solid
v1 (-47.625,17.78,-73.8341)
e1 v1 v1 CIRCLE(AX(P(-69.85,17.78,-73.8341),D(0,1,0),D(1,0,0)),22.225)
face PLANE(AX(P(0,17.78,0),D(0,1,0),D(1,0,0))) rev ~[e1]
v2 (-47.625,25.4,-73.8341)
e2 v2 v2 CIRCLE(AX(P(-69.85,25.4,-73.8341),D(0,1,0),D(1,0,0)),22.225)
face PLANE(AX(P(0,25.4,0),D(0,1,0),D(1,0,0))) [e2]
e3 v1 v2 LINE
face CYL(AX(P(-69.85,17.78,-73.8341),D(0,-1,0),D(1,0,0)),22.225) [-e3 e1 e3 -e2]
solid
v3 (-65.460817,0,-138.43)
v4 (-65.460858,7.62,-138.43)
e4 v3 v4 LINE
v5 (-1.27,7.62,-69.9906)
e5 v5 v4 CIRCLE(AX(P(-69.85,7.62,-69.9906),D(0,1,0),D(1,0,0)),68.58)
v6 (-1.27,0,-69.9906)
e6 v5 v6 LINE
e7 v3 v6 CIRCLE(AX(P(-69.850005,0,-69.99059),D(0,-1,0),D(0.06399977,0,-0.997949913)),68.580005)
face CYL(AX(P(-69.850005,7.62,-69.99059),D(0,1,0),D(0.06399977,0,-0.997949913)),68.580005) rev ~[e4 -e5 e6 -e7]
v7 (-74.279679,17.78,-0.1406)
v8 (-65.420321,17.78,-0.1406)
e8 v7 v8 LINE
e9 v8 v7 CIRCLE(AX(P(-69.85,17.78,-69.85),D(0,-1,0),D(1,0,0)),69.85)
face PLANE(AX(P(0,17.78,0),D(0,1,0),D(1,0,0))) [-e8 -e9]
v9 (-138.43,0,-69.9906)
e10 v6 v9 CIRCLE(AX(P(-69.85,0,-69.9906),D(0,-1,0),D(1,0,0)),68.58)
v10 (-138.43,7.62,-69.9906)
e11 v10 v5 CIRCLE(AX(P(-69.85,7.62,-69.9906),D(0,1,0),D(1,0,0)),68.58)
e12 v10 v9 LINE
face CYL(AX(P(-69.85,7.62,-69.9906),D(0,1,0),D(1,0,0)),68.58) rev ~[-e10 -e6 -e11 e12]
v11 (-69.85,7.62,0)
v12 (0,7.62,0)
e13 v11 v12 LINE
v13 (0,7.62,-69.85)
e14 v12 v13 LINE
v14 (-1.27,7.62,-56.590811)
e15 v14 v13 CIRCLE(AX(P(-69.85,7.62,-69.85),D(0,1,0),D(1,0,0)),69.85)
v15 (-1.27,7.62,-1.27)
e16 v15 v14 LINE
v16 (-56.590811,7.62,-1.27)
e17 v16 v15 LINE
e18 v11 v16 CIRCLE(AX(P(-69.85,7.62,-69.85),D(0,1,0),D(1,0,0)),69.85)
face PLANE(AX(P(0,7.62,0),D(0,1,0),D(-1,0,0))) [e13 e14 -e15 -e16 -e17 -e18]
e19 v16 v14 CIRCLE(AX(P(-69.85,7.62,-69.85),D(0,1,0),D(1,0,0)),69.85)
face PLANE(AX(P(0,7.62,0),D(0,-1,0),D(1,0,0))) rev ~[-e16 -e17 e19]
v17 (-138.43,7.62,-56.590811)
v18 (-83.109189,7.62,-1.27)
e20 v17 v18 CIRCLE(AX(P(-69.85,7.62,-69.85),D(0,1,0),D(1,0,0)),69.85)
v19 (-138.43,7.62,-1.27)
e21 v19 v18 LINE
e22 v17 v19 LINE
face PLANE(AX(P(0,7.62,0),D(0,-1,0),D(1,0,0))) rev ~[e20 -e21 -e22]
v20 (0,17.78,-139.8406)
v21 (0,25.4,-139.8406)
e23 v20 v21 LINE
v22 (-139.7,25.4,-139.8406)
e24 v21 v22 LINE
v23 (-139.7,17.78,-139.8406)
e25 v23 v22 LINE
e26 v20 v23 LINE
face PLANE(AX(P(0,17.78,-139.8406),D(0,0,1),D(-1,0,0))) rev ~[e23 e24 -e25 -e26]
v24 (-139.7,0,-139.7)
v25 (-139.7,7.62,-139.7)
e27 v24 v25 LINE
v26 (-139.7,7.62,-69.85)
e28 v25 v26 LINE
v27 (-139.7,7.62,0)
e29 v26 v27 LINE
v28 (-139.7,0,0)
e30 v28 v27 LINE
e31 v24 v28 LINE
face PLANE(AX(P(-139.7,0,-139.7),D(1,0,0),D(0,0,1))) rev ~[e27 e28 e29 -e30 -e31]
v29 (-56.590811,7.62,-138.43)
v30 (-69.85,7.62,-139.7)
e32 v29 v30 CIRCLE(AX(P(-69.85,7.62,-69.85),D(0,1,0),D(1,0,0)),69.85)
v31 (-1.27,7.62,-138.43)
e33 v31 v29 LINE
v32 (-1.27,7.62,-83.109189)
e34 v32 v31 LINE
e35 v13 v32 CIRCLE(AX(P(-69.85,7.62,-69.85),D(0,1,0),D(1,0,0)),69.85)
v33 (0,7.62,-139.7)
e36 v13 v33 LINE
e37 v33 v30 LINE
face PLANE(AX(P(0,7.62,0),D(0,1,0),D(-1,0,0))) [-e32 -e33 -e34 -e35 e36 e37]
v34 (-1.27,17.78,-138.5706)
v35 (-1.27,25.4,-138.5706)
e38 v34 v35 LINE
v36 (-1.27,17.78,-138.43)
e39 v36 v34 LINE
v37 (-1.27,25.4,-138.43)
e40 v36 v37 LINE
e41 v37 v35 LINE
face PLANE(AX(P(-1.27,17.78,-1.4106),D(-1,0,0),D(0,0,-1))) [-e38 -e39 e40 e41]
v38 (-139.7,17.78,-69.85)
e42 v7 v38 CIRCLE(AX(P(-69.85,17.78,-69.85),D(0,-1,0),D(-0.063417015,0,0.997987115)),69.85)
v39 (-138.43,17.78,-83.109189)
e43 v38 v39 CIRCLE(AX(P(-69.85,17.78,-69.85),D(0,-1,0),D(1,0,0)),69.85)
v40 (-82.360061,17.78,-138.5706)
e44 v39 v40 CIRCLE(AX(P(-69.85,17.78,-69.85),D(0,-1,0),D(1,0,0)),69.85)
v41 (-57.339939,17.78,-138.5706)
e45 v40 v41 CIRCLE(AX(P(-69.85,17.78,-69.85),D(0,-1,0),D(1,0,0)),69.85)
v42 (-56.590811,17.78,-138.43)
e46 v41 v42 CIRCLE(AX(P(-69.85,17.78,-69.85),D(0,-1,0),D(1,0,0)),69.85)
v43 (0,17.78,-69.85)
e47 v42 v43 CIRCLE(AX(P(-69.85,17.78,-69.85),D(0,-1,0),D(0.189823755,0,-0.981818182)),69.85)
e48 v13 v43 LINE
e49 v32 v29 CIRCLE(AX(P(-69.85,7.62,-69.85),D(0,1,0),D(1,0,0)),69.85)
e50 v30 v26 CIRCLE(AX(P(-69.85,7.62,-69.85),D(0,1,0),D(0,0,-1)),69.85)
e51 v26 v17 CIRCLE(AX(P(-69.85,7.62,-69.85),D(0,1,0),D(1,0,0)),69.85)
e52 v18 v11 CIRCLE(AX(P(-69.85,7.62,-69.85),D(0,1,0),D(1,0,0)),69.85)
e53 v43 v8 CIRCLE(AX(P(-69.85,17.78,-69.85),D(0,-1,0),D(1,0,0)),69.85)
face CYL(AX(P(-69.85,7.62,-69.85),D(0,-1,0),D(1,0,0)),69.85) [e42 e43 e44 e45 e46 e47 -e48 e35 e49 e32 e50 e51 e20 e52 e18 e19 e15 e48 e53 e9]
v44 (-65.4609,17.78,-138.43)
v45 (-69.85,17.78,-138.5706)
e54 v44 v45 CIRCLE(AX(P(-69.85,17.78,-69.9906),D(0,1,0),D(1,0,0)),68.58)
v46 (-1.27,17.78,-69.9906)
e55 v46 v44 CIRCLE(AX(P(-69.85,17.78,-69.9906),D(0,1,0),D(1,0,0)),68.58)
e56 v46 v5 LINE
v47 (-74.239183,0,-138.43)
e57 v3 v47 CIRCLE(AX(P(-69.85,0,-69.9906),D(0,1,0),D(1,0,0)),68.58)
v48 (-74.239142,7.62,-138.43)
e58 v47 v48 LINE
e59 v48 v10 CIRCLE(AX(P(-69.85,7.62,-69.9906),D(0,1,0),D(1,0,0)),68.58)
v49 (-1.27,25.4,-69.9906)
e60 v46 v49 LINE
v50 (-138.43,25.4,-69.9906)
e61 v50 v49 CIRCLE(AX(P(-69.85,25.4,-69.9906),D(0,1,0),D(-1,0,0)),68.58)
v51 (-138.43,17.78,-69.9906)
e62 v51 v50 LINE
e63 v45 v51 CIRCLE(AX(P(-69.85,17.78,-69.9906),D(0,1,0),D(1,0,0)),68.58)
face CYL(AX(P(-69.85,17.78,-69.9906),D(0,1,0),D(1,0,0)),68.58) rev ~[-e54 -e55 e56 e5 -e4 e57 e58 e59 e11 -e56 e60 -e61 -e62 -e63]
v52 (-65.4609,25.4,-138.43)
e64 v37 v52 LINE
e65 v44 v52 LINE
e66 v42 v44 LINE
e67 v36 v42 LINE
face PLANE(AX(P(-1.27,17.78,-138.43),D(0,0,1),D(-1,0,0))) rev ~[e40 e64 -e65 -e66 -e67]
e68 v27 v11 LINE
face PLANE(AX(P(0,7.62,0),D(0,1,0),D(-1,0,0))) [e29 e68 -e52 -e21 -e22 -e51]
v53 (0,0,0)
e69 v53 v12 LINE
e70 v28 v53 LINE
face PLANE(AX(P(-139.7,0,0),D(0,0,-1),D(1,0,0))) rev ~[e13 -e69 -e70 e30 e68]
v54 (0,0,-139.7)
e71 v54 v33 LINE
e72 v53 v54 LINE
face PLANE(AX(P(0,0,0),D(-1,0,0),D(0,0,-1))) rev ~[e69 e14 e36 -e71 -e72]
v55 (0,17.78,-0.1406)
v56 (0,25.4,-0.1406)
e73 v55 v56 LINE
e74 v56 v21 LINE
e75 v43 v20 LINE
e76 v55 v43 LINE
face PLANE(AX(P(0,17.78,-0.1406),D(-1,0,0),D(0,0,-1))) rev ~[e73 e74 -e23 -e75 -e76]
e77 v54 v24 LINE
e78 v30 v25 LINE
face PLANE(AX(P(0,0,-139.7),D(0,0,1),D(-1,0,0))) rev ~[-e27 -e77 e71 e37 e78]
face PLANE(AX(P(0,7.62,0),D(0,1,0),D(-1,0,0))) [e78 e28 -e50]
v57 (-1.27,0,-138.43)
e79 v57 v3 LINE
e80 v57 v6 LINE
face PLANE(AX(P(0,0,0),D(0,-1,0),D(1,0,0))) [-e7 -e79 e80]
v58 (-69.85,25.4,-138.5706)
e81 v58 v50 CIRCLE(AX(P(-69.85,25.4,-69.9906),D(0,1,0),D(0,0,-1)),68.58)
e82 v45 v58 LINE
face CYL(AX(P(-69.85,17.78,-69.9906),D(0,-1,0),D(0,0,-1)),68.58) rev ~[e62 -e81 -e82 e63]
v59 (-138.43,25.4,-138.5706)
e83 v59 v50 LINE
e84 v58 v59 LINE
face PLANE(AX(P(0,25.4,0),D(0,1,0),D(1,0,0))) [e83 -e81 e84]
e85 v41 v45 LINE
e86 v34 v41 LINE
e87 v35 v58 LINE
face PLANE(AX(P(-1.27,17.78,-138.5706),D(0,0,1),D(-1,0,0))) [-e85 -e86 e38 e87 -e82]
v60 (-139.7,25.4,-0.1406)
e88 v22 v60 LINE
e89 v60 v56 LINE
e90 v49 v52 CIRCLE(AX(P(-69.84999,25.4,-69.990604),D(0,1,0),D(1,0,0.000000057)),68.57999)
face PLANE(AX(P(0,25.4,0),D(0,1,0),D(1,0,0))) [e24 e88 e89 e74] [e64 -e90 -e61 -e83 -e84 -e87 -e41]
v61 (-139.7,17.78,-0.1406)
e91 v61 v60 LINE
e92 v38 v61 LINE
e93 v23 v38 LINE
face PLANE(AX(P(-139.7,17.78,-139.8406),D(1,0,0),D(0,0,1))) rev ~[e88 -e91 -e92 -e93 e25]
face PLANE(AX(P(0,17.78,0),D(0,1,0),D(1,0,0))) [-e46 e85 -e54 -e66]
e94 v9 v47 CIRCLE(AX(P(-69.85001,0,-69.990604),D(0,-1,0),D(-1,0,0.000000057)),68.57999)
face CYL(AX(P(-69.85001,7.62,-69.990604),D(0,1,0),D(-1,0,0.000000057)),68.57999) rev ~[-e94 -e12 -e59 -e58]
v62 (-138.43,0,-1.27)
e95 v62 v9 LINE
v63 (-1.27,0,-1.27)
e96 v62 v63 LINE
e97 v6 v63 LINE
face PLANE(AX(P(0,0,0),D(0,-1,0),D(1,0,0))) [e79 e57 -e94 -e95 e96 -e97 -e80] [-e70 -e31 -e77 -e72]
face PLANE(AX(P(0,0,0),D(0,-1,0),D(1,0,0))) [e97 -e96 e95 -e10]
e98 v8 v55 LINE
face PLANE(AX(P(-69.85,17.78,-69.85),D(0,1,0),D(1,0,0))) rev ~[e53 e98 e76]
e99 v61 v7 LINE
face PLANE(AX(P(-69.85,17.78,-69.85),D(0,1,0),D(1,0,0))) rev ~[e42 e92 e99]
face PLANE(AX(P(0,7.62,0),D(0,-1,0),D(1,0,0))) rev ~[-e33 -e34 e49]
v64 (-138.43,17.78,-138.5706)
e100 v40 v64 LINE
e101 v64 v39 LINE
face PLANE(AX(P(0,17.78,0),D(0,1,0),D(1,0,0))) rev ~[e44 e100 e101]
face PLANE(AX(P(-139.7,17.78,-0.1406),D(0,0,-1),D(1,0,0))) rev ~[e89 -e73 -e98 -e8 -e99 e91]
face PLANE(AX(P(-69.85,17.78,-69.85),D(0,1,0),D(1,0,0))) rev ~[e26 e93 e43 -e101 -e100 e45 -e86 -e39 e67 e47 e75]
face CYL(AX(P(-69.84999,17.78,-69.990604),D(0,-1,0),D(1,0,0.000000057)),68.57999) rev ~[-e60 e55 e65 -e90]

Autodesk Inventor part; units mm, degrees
ref_plane "YZ Plane" through (0, 0, 0) normal (1, 0, 0) x (0, 1, 0)
ref_plane "XZ Plane" through (0, 0, 0) normal (0, 1, 0) x (-1, 0, 0)
ref_plane "XY Plane" through (0, 0, 0) normal (0, 0, 1) x (1, 0, 0)
sketch "Sketch1" plane through (0, 0, 0) normal (0, 1, 0) x (-1, 0, 0)
  line L0 (0, 0) -> (0, -139.7)
  line L1 (0, -139.7) -> (139.7, -139.7)
  line L2 (139.7, -139.7) -> (139.7, 0)
  line L3 (139.7, 0) -> (0, 0)
  dimension "d0" = 139.7
  dimension "d1" = 139.7
  dimension "d2" = 139.7
extrude "Extrusion1" add sketch "Sketch1" along normal blind 7.62
sketch "Sketch2" plane through (0, 7.62, 0) normal (0, 1, 0) x (1, 0, 0)
  line L0 (-138.43, 1.27) -> (-1.27, 1.27)
  line L1 (-1.27, 1.27) -> (-1.27, 138.43)
  line L2 (-1.27, 138.43) -> (-138.43, 138.43)
  line L3 (-138.43, 138.43) -> (-138.43, 1.27)
  line L4 (-139.7, 0) -> (0, 0) projected
  line L5 (0, 0) -> (0, 139.7) projected
  dimension "d5" = 137.16
  dimension "d6" = 137.16
  dimension "d7" = 1.27
  dimension "d8" = 1.27
extrude "Extrusion2" cut sketch "Sketch2" against normal blind 25.4
sketch "Sketch3" plane through (0, 7.62, 0) normal (0, 1, 0) x (1, 0, 0)
  circle A0 centre (-69.85, 69.85) radius 69.85
  line L0 (-139.7, 0) -> (0, 0) projected
  line L1 (-139.7, 139.7) -> (-139.7, 0) projected
  dimension "d11" = 139.7
  dimension "d12" = 69.85
  dimension "d13" = 69.85
extrude "Extrusion3" add sketch "Sketch3" along normal blind 10.16 contours A0
sketch "Sketch4" plane through (-69.85, 17.78, -69.85) normal (0, 1, 0) x (1, 0, 0)
  line L0 (-69.85, -69.7094) -> (69.85, -69.7094)
  line L1 (69.85, -69.7094) -> (69.85, 69.9906)
  line L2 (69.85, 69.9906) -> (-69.85, 69.9906)
  line L3 (-69.85, 69.9906) -> (-69.85, -69.7094)
  line L4 (-68.58, -68.4394) -> (68.58, -68.4394)
  line L5 (68.58, -68.4394) -> (68.58, 68.7206)
  line L6 (68.58, 68.7206) -> (-68.58, 68.7206)
  line L7 (-68.58, 68.7206) -> (-68.58, -68.4394)
  point P0 (69.85, -69.85)
  dimension "d16" = 139.7
  dimension "d17" = 139.7
  dimension "d18" = 137.16
  dimension "d19" = 137.16
  dimension "d20" = 1.27
  dimension "d21" = 1.27
extrude "Extrusion4" add sketch "Sketch4" along normal blind 7.62
sketch "Sketch5" plane through (0, 17.78, 0) normal (0, 1, 0) x (1, 0, 0)
  circle A0 centre (-69.85, 69.9906) radius 68.58
  line L0 (0, 0.1406) -> (0, 139.8406) projected
  line L1 (0, 139.8406) -> (-139.7, 139.8406) projected
  point P0 (0, 0)
  dimension "d24" = 137.16
  dimension "d25" = 69.85
  dimension "d26" = 69.85
extrude "Extrusion5" cut sketch "Sketch5" against normal blind 25.4
sketch "Sketch6" plane through (0, 17.78, 0) normal (0, 1, 0) x (1, 0, 0)
  circle A0 centre (-69.85, 73.8341) radius 22.225
  line L0 (-139.7, 139.8406) -> (-139.7, 0.1406) projected
  point P0 (0, 0)
  dimension "d29" = 44.45
  dimension "d30" = 69.85
extrude "Extrusion6" add sketch "Sketch6" along normal blind 7.62
sketch "Sketch7" plane through (0, 7.62, 0) normal (0, -1, 0) x (1, 0, 0)
  line L0 (-74.2391, -138.43) -> (-138.43, -138.43) projected
  line L1 (-138.43, -138.43) -> (-138.43, -1.27) projected
  arc A0 (-138.43, -69.9906) -> (-74.2391, -138.43) centre (-69.85, -69.9906) ccw projected
  point P0 (0, 0)
extrude "Extrusion7" add sketch "Sketch7" along normal blind 7.62
sketch "Sketch8" plane through (0, 17.78, 0) normal (0, 1, 0) x (1, 0, 0)
  arc A0 (-138.43, 69.9906) -> (-1.27, 69.9906) centre (-69.85, 69.9906) ccw projected
  line L0 (-138.43, 69.9906) -> (-138.43, 1.27) projected
  line L1 (-138.43, 1.27) -> (-1.27, 1.27) projected
  arc A1 (-1.27, 69.9906) -> (-65.4609, 138.43) centre (-69.85, 69.9906) ccw projected
  line L2 (-1.27, 138.43) -> (-65.4609, 138.43) projected
  line L3 (-1.27, 1.27) -> (-1.27, 138.43) projected
  point P0 (0, 0)
extrude "Extrusion8" add sketch "Sketch8" along normal blind 7.62
sketch "Sketch9" plane through (0, 17.78, 0) normal (0, 1, 0) x (1, 0, 0)
  arc A0 (-69.85, 138.5706) -> (-138.43, 69.9906) centre (-69.85, 69.9906) ccw projected
  line L0 (-138.43, 69.9906) -> (-138.43, 138.5706) projected
  line L1 (-138.43, 138.5706) -> (-1.27, 138.5706) projected
  point P0 (0, 0)
extrude "Extrusion9" add sketch "Sketch9" along normal blind 7.62
sketch "Sketch10" plane through (0, 7.62, 0) normal (0, -1, 0) x (1, 0, 0)
  arc A0 (-1.27, -69.9906) -> (-138.43, -69.9906) centre (-69.85, -69.9906) ccw projected
  line L0 (-138.43, -1.27) -> (-1.27, -1.27) projected
  line L1 (-1.27, -1.27) -> (-1.27, -138.43) projected
  arc A1 (-138.43, -69.9906) -> (-65.4609, -138.43) centre (-69.85, -69.9906) ccw projected
  arc A2 (-65.4609, -138.43) -> (-1.27, -69.9906) centre (-69.85, -69.9906) ccw projected
  line L2 (-1.27, -138.43) -> (-65.4609, -138.43) projected
  line L3 (-138.43, -69.9906) -> (-138.43, -1.27) projected
  point P0 (0, 0)
extrude "Extrusion10" add sketch "Sketch10" along normal blind 7.62 contours A0 L3 L0 L1 | L1 L2 A2
sketch "Sketch11" plane through (-69.85, 25.4, -69.85) normal (0, 1, 0) x (1, 0, 0)
  point P0 (69.85, -69.85)
sketch "Sketch12" plane through (-69.85, 25.4, -73.8341) normal (0, 1, 0) x (1, 0, 0)
  point P0 (69.85, -73.8341)
sketch "Sketch13" plane through (-69.85, 25.4, -73.8341) normal (0, 1, 0) x (1, 0, 0)
  circle A0 centre (0, 0) radius 22.225 projected
  line L0 (-22.225, 0) -> (-53.9134, -46.2286)
  line L1 (-19.8453, -10.0057) -> (-48.9888, -52.5219)
  line L2 (22.225, 0) -> (50.003, 43.3412)
  line L3 (19.7307, 10.2298) -> (43.7736, 47.7431)
  line L4 (0, -22.225) -> (26.4575, -67.3455)
  line L5 (7.9672, -20.7479) -> (33.5583, -64.3906)
  line L6 (0, 22.225) -> (-22.6143, 60.3325)
  line L7 (-9.2826, 20.1937) -> (-31.2674, 57.6865)
  arc A1 (0, 64.7364) -> (4.3891, 64.5959) centre (0, -3.8436) ccw projected
  point P0 (69.85, -73.8341)
  dimension "d41" = 7.62
  dimension "d42" = 7.62
  dimension "d43" = 43.4631
  dimension "d44" = 44.3124
  dimension "d45" = 44.5568
  dimension "d46" = 0.3
  dimension "d47" = 7.62
properties part number "fan shell"
